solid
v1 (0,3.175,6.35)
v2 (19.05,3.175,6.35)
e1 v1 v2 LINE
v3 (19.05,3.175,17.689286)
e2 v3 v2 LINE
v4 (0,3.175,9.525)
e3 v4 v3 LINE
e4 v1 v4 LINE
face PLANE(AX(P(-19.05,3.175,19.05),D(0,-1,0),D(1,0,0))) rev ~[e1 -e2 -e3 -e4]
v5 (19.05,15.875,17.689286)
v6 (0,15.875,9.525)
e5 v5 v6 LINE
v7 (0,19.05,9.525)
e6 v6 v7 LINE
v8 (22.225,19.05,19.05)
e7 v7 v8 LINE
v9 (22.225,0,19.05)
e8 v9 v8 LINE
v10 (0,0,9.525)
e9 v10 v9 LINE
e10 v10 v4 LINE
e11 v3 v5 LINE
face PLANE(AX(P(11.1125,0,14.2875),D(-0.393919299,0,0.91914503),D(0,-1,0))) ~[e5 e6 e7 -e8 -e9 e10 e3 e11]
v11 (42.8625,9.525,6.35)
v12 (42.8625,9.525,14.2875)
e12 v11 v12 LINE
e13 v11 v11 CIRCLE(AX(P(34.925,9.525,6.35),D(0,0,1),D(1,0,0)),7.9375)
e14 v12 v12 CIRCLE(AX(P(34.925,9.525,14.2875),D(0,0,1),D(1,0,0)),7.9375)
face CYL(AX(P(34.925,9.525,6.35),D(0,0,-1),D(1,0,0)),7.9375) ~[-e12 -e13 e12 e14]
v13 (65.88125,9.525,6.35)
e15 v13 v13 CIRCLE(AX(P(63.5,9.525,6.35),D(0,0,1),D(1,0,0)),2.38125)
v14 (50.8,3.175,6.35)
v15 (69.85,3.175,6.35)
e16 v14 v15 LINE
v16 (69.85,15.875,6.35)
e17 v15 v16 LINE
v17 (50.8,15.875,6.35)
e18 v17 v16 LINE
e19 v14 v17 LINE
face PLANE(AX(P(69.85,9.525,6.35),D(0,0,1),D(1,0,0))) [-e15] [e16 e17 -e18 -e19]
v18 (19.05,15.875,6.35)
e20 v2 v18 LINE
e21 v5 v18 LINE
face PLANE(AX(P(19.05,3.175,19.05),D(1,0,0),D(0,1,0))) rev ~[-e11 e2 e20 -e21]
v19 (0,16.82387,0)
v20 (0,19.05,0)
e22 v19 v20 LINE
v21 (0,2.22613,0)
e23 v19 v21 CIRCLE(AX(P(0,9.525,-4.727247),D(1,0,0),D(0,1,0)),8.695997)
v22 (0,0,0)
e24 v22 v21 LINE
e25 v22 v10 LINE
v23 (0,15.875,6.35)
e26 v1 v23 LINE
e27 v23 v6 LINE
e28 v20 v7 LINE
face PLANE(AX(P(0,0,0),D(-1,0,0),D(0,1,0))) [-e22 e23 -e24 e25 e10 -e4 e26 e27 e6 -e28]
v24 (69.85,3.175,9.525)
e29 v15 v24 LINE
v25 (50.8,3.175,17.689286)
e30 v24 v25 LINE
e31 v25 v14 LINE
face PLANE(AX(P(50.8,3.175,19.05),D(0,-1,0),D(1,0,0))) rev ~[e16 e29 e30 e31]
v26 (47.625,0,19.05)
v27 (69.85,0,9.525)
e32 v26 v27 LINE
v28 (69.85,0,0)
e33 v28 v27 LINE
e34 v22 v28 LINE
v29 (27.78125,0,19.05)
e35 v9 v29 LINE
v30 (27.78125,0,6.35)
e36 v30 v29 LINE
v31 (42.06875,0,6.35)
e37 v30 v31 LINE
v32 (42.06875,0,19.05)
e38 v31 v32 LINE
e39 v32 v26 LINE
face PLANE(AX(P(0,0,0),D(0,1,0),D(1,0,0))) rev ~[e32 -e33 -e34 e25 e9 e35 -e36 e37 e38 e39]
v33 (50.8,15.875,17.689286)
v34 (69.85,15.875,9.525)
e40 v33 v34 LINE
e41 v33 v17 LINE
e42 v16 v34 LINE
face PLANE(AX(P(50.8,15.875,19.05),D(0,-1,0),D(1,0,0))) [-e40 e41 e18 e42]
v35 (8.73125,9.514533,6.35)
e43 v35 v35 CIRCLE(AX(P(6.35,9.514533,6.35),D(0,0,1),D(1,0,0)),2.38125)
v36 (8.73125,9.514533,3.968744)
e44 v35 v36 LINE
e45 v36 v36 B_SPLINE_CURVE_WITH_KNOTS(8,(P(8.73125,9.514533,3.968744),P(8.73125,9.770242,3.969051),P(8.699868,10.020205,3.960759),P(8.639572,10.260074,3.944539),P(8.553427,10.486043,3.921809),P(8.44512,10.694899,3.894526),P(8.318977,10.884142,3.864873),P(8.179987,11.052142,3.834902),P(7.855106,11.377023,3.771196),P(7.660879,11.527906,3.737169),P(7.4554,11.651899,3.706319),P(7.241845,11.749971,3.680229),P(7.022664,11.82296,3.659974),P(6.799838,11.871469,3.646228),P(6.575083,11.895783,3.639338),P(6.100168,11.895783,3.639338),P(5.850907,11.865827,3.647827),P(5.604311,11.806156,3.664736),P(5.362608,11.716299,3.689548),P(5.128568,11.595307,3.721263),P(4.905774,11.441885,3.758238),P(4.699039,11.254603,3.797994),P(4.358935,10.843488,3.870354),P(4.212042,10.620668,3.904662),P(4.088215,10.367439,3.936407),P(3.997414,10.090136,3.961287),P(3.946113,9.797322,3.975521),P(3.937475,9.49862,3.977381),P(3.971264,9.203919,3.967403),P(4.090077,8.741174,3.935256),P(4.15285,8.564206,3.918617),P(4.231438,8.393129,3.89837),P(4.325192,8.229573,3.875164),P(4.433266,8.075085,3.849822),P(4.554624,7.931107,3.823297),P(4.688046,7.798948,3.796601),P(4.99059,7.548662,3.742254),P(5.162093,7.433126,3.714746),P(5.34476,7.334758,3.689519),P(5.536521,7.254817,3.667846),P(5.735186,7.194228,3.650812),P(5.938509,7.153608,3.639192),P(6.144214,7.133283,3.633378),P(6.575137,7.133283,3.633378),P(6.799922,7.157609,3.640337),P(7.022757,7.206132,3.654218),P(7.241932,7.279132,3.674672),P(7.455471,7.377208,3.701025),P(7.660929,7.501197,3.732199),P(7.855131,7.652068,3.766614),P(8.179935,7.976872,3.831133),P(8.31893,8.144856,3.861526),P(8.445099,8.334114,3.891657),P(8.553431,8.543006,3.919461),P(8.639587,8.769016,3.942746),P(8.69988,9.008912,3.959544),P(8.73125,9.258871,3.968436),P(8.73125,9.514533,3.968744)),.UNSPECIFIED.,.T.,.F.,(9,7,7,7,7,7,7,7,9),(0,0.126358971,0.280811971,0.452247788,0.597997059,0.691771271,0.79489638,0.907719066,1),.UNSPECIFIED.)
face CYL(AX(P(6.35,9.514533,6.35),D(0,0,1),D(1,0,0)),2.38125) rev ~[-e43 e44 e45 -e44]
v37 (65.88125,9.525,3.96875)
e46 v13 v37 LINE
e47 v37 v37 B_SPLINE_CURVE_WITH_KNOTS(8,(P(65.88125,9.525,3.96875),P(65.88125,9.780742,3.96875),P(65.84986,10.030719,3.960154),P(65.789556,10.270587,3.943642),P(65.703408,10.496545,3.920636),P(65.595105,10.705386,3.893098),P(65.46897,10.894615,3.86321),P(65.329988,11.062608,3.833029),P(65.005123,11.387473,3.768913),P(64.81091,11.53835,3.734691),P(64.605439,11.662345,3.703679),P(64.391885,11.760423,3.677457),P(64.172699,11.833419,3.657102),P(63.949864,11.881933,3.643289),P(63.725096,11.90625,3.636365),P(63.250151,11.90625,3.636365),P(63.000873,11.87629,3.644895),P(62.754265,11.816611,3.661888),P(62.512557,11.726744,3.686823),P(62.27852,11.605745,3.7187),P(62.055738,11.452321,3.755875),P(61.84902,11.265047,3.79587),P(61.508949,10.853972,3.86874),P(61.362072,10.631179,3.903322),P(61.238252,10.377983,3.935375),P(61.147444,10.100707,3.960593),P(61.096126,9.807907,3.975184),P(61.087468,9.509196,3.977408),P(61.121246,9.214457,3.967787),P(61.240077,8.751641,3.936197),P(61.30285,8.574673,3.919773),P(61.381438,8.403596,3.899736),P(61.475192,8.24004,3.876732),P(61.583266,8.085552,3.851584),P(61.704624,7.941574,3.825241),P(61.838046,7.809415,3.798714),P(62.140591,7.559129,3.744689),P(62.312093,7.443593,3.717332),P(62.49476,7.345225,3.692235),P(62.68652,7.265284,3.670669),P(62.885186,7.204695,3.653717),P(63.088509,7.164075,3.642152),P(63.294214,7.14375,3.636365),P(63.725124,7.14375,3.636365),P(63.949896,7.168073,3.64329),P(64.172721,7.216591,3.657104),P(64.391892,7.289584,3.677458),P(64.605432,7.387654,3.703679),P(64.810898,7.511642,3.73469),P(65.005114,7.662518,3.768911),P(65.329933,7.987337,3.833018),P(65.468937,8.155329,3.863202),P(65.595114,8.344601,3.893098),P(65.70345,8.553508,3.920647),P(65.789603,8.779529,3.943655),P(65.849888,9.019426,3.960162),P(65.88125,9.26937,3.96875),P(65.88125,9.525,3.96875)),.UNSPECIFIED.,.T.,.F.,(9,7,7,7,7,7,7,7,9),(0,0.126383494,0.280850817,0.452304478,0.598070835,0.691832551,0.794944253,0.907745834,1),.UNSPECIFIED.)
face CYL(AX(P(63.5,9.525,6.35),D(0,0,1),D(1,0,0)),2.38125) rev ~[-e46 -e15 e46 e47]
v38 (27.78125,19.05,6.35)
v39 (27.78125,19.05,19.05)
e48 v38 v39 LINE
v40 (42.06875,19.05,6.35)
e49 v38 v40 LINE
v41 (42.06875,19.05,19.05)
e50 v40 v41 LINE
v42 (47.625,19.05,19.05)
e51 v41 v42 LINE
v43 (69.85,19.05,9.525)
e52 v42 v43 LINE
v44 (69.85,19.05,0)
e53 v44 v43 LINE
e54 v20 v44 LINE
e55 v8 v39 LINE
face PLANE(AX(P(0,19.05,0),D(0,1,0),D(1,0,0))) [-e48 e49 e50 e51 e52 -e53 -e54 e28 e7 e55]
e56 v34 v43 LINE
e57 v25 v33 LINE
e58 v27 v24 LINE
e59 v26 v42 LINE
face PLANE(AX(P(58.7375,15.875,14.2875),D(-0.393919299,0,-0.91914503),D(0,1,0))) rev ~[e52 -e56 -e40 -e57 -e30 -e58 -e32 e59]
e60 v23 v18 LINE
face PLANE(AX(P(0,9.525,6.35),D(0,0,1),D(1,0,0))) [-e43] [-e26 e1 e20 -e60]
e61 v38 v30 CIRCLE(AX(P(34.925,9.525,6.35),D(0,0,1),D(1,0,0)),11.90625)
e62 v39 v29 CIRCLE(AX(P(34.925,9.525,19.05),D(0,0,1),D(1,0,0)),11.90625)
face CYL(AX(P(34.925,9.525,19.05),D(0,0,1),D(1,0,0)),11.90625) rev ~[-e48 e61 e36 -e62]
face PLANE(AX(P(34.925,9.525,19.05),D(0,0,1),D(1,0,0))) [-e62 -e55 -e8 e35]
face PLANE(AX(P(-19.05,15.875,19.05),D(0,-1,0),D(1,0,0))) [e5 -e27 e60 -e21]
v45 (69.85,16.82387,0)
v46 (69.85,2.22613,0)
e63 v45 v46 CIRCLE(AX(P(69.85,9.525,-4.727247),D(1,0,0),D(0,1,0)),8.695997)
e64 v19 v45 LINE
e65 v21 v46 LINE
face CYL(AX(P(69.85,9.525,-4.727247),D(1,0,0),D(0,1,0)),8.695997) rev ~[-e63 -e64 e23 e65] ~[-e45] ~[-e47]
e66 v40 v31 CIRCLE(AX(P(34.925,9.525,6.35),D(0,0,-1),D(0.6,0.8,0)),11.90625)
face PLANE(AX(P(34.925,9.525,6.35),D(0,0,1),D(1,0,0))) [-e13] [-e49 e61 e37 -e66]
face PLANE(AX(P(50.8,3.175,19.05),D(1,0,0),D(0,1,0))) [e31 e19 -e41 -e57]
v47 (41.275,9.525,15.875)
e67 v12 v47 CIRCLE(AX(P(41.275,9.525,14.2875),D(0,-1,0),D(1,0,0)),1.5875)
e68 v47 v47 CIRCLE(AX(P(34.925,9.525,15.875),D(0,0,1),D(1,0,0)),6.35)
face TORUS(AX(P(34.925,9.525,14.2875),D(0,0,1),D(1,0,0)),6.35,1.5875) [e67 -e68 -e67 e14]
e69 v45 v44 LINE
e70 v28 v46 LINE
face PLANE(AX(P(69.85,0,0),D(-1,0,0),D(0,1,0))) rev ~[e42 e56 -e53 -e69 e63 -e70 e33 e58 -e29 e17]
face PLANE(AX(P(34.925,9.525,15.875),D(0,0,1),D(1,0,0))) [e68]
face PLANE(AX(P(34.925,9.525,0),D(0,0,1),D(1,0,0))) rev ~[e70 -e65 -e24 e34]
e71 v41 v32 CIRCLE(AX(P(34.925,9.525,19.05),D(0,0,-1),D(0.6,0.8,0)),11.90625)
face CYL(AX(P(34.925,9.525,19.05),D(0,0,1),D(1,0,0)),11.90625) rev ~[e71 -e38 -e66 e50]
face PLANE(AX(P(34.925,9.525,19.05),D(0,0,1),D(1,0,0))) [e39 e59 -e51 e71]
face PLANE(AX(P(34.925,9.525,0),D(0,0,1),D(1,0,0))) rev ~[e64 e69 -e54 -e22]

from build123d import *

# Parameters (mm, degrees)
F0_W         = 69.85
F0_H         = 19.05
F1_DEPTH     = 19.05
F2_R         = 11.90625
F3_DEPTH     = 12.7
F4_R         = 7.9375
F5_DEPTH     = 9.525
F6_W         = 38.1
F6_H         = 12.7
F7_DEPTH     = 12.7
F8_R         = 2.38125
F9_DEPTH     = 25.4
F10_R        = 8.6959968999
F11_DEPTH    = 69.851
F12_R        = 1.5875
F13_C1_SIZE2 = 9.525
F13_C1_SIZE  = 22.225
F13_C2_SIZE2 = 22.225
F13_C2_SIZE  = 9.525


# Not quite as in the source:
# - two fillets or chamfers of one size are made in one step


with BuildPart() as f1:
    # F0 (on Top) → F1 (new body)
    with BuildSketch(Plane.XY):
        with Locations((34.925, 9.525)):
            Rectangle(F0_W, F0_H)
    extrude(amount=F1_DEPTH)

    # F2 (on face) → F3 (cut)
    with BuildSketch(Plane.XY.offset(19.05)):
        with Locations((34.925, 9.525)):
            Circle(F2_R)
    extrude(amount=-F3_DEPTH, mode=Mode.SUBTRACT)

    # F4 (on face) → F5 (join)
    with BuildSketch(Plane.XY.offset(6.35)):
        with Locations((34.925, 9.525)):
            Circle(F4_R)
    extrude(amount=F5_DEPTH)

    # F6 (on face) → F7 (cut)
    with BuildSketch(Plane.XY.offset(19.05)):
        with Locations((69.85, 9.525)):
            Rectangle(F6_W, F6_H)
        with Locations((0, 9.525)):
            Rectangle(F6_W, F6_H)
    extrude(amount=-F7_DEPTH, mode=Mode.SUBTRACT)

    # F8 (on face) → F9 (cut)
    with BuildSketch(Plane.XY.offset(6.35)):
        with Locations((63.5, 9.525)):
            Circle(F8_R)
        with Locations((6.35, 9.5145329833)):
            Circle(F8_R)
    extrude(amount=-F9_DEPTH, mode=Mode.SUBTRACT)

    # F10 (on face) → F11 (cut, through all)
    with BuildSketch(Plane.YZ.offset(69.85)):
        with Locations((9.525, -4.7272468999)):
            Circle(F10_R)
    extrude(amount=-F11_DEPTH, mode=Mode.SUBTRACT)

    # F12
    f12_edges = [f1.edges().sort_by_distance(p)[0] for p in [
        (26.9875, 9.525, 15.875),
    ]]
    fillet(f12_edges, radius=F12_R)

    # F13: chamfer of 9.525 x 22.225 on 4 edges, made by hand

    # F13_c1
    f13_c1_edges = [f1.edges().sort_by_distance(p)[0] for p in [
        (69.85, 17.4625, 19.05),
    ]]
    f13_c1_side = f1.faces().sort_by_distance((69.6595, 17.4625, 19.05))[0]
    chamfer(f13_c1_edges, length=F13_C1_SIZE, length2=F13_C1_SIZE2, reference=f13_c1_side)

    # F13_c2
    f13_c2_edges = [f1.edges().sort_by_distance(p)[0] for p in [
        (0, 1.5875, 19.05),
    ]]
    f13_c2_side = f1.faces().sort_by_distance((0, 1.5875, 18.8595))[0]
    chamfer(f13_c2_edges, length=F13_C2_SIZE, length2=F13_C2_SIZE2, reference=f13_c2_side)


solid = f1.part
